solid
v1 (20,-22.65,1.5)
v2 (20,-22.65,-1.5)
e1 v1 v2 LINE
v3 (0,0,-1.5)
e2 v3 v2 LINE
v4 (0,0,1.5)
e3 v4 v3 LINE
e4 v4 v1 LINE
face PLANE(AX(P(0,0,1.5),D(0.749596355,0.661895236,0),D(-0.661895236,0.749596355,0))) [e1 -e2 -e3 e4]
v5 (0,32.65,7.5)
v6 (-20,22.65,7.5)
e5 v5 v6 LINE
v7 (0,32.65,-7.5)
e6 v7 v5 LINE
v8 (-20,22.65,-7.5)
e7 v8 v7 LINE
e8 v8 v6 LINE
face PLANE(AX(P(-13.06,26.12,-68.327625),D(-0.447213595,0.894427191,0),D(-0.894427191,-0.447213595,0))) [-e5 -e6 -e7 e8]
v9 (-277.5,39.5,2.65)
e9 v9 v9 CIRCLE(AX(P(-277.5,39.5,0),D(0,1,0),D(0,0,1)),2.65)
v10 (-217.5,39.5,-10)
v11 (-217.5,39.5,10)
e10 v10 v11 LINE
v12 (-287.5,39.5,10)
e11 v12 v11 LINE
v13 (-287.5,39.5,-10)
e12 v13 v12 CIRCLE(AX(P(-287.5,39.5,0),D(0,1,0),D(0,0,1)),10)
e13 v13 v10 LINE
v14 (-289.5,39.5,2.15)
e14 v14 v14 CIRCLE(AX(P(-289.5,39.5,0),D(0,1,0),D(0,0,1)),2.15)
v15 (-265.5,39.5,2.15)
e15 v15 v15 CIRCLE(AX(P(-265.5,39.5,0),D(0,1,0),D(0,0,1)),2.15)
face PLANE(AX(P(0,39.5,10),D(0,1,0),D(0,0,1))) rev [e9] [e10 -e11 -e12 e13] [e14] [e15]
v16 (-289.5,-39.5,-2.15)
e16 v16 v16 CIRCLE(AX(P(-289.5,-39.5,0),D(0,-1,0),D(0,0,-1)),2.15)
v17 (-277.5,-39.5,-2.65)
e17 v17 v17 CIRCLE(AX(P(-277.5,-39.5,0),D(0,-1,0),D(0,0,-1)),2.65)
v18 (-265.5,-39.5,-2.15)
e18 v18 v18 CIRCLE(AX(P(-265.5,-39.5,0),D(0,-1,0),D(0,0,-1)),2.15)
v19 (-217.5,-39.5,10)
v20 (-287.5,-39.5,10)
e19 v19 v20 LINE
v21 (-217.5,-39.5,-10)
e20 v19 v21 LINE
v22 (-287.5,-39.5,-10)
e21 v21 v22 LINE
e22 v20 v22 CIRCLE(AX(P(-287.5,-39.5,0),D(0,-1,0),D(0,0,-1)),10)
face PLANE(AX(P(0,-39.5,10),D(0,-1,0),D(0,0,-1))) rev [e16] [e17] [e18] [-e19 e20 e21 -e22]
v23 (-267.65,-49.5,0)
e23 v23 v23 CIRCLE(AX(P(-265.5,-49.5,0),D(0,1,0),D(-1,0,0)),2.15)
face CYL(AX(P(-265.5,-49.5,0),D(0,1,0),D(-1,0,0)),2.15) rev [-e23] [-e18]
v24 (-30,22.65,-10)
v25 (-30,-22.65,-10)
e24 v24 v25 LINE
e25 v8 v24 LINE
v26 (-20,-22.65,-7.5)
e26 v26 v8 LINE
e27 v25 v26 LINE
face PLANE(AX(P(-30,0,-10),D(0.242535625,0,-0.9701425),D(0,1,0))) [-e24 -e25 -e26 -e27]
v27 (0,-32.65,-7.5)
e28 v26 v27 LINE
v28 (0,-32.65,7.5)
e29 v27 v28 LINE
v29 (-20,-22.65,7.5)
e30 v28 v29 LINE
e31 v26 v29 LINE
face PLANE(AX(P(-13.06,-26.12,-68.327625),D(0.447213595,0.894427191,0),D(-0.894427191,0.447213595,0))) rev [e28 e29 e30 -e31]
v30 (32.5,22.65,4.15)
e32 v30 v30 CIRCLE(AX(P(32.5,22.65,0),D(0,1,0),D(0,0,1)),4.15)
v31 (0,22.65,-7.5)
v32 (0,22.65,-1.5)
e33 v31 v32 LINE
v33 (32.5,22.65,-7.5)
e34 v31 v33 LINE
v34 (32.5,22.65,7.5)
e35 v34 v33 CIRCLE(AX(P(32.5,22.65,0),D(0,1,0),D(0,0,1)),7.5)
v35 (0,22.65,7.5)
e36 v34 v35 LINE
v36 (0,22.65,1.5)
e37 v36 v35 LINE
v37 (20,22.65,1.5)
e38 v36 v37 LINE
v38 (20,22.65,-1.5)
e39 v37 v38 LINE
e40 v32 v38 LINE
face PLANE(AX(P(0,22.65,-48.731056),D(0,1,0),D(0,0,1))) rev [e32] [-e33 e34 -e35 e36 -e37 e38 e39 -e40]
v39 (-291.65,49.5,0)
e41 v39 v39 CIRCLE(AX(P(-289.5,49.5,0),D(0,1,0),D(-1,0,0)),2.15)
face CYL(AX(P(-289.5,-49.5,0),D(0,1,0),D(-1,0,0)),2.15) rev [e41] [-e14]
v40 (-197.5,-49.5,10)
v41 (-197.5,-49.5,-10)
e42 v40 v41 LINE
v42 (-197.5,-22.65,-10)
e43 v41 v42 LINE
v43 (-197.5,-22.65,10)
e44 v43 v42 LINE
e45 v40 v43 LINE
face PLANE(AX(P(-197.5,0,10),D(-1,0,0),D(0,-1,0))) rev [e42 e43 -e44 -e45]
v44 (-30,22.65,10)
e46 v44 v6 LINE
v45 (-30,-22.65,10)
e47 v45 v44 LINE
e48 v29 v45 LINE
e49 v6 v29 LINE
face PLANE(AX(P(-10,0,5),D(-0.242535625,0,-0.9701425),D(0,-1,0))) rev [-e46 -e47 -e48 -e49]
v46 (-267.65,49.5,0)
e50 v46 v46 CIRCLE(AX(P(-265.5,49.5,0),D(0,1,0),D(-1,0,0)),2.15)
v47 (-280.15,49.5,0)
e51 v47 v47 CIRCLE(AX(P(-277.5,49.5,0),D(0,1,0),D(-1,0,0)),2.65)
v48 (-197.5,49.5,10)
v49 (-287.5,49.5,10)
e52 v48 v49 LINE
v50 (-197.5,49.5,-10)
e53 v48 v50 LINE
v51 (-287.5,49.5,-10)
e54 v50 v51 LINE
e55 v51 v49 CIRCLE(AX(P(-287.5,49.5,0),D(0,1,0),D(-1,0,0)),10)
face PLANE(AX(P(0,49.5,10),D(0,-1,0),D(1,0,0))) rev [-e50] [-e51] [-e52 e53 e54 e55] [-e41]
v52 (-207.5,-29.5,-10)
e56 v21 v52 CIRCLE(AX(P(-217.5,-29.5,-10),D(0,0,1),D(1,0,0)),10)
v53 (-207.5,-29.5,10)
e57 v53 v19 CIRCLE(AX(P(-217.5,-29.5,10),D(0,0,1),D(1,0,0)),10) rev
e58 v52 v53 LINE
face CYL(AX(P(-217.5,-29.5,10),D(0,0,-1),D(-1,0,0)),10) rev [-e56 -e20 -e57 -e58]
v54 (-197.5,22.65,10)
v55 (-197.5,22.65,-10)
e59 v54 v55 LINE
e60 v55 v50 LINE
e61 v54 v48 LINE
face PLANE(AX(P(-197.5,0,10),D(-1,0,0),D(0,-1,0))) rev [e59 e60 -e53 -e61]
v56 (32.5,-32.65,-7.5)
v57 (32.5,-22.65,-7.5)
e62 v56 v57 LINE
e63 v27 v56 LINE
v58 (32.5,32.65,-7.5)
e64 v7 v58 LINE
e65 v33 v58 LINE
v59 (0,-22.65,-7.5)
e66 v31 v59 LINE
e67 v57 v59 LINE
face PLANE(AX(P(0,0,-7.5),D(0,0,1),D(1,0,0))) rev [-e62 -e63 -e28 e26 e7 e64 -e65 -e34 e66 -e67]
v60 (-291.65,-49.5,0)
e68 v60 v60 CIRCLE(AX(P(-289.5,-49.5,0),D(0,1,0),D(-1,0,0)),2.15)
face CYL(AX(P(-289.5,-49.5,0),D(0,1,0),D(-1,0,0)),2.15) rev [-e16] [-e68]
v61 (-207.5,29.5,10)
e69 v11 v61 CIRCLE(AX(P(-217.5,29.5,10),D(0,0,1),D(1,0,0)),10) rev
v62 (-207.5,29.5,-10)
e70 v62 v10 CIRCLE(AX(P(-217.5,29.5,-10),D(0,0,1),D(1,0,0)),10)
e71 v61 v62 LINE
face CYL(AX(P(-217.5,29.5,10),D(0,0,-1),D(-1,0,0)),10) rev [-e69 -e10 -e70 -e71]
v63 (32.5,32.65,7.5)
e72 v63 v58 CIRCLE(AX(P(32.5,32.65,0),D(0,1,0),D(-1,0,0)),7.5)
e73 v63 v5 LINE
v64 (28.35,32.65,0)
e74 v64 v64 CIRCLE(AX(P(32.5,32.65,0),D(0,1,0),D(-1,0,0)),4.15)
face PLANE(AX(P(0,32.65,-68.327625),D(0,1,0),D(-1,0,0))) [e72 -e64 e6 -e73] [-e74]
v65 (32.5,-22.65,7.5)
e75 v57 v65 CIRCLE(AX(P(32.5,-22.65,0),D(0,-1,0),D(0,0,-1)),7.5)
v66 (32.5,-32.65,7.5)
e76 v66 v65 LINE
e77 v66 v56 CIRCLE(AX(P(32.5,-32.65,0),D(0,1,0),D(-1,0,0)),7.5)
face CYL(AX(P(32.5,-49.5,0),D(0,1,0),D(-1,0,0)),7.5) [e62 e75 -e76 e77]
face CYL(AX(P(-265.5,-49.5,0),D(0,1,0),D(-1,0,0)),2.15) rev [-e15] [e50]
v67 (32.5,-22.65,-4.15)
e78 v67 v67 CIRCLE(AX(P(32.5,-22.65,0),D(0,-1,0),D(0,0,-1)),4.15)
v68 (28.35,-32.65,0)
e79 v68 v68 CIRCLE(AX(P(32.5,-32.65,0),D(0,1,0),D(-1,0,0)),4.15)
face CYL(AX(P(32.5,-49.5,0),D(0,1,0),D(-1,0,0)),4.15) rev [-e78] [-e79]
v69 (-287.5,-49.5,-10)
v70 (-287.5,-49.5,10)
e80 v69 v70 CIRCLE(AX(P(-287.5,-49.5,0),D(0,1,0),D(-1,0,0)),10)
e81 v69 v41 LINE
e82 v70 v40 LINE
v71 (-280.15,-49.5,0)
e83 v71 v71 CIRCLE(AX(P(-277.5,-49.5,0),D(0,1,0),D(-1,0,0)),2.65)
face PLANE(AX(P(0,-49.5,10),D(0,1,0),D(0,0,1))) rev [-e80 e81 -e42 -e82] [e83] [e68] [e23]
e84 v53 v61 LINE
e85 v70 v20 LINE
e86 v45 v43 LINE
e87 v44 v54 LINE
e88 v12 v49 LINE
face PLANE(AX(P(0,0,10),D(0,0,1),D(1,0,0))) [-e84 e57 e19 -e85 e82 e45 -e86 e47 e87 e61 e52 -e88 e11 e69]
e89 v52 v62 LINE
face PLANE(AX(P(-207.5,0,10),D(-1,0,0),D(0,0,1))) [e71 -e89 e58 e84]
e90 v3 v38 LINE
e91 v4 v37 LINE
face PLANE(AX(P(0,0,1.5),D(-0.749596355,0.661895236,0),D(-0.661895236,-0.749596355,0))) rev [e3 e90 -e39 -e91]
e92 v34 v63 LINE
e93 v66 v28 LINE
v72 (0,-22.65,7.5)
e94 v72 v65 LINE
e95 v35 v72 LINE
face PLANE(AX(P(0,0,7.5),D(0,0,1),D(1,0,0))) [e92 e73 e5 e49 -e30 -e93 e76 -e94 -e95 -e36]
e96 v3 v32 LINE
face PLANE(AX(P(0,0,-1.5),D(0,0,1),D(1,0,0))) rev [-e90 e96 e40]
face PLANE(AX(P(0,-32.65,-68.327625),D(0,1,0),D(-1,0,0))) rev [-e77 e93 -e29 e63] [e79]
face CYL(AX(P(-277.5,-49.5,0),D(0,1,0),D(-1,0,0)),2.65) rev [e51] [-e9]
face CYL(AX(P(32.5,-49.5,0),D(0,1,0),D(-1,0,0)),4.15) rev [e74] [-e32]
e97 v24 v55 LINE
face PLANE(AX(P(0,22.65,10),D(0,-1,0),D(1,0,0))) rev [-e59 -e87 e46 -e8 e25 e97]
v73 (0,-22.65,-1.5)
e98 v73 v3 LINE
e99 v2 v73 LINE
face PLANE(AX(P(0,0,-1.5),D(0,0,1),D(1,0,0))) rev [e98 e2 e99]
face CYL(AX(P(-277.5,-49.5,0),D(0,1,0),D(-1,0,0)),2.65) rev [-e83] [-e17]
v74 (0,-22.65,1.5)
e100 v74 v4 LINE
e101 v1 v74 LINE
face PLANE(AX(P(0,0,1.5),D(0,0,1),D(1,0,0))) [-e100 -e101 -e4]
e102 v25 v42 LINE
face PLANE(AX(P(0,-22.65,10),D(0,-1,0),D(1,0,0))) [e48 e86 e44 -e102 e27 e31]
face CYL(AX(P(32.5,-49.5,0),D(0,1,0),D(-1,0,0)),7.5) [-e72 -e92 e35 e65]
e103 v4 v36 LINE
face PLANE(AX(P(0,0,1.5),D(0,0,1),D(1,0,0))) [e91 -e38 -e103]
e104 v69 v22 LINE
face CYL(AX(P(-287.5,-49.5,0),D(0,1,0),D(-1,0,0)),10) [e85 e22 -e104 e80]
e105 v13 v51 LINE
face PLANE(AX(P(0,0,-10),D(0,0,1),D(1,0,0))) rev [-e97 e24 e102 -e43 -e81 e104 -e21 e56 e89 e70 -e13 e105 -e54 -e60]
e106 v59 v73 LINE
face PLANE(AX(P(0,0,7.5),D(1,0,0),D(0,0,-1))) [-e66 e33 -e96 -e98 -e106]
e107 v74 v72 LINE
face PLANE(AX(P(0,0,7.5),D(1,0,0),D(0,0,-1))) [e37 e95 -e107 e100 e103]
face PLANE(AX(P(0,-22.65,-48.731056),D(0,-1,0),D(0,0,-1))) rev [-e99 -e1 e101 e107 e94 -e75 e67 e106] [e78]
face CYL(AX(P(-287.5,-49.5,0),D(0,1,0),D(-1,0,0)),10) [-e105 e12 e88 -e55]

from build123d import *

# Parameters (mm, degrees)
SKETCH_2_W               = 187.5
SKETCH_2_H               = 45.3
EXTRUDE_1_DEPTH          = 10
EXTRUDE_2_DEPTH          = 7.5
CHAMFER_1_SIZE           = 20
CHAMFER_1_SIZE_2         = 5
CHAMFER_2_SIZE           = 5
CHAMFER_2_SIZE_2         = 20
SKETCH_7_W               = 40
SKETCH_7_H               = 10
EXTRUDE_6_DEPTH          = 15
SKETCH_7_3_W             = 40
SKETCH_7_3_H             = 10
CUT_EXTRUDE_3_DEPTH      = 15
EXTRUDE_7_DEPTH          = 1.5
CUT_EXTRUDE_1_DEPTH      = 314.699298692
CUT_EXTRUDE_2_DEPTH      = 307.287238552
CUT_EXTRUDE_2_DEPTH_BACK = 307.287238552
FILLET_1_R               = 10


with BuildPart() as part:
    # 草图2 → 凸台-拉伸1 (new, symmetric)
    with BuildSketch(Plane.XY):
        with Locations((-103.75, 0)):
            Rectangle(SKETCH_2_W, SKETCH_2_H)
        Polygon((-297.5, 49.5), (-297.5, 39.5), (-207.5, 39.5), (-207.5, -39.5), (-297.5, -39.5), (-297.5, -49.5), (-197.5, -49.5), (-197.5, 49.5), align=None)
    extrude(amount=EXTRUDE_1_DEPTH, both=True)

    # 草图2<3> → 凸台-拉伸2 (add, symmetric)
    with BuildSketch(Plane.XY):
        Polygon((40, -22.65), (40, -12.65), (0, -12.65), (0, 12.65), (40, 12.65), (40, 22.65), (-10, 22.65), (-10, -22.65), align=None)
    extrude(amount=EXTRUDE_2_DEPTH, both=True)

    # 倒角1
    # the kernel refuses this chamfer: 20, 5 mm, written as the material it takes off along each edge
    with BuildSketch(Plane(origin=(-10, -74.592549995, 10), x_dir=(-0.9999563942249224, 0, 0.00933861064031752), z_dir=(0, 1, 0))) as chamfer_1_piece_1_section:
        Polygon((CHAMFER_1_SIZE * 0.999956394225, -CHAMFER_1_SIZE * 0.00933861064032), (-CHAMFER_1_SIZE_2 * 0.00933861064032, -CHAMFER_1_SIZE_2 * 0.999956394225), (0, 0), align=None)
    chamfer_1_piece_1 = extrude(amount=149.185099991, mode=Mode.PRIVATE)
    chamfer_1_piece_1 = split(chamfer_1_piece_1, bisect_by=Plane(origin=(-18.245866107, 0, 7.5), z_dir=(0, 0, 1)), keep=Keep.TOP, mode=Mode.PRIVATE)
    add(chamfer_1_piece_1, mode=Mode.SUBTRACT)

    # 倒角2
    # the kernel refuses this chamfer: 20, 5 mm, written as the material it takes off along each edge
    with BuildSketch(Plane(origin=(-10, -74.592549995, -10), x_dir=(0.14778356633657133, 0, 0.9890197255468893), z_dir=(0, 1, 0))) as chamfer_2_piece_1_section:
        Polygon((CHAMFER_2_SIZE * 0.989019725547, -CHAMFER_2_SIZE * 0.147783566337), (-CHAMFER_2_SIZE_2 * 0.147783566337, -CHAMFER_2_SIZE_2 * 0.989019725547), (0, 0), align=None)
    chamfer_2_piece_1 = extrude(amount=149.185099991, mode=Mode.PRIVATE)
    chamfer_2_piece_1 = split(chamfer_2_piece_1, bisect_by=Plane(origin=(-18.245866107, 0, -7.5), z_dir=(0, 0, -1)), keep=Keep.TOP, mode=Mode.PRIVATE)
    add(chamfer_2_piece_1, mode=Mode.SUBTRACT)

    # 草图7 → 凸台-拉伸6 (add)
    with BuildSketch(Plane.XY.offset(7.5)):
        Polygon((0, 22.65), (0, 32.65), (-20, 22.65), align=None)
        with Locations((20, 27.65)):
            Rectangle(SKETCH_7_W, SKETCH_7_H)
        Polygon((40, -32.65), (0, -32.65), (-20, -22.65), (40, -22.65), align=None)
    extrude(amount=-EXTRUDE_6_DEPTH)

    # 草图7<3> → 切除-拉伸3 (cut)
    with BuildSketch(Plane.XY.offset(7.5)):
        with Locations((20, 17.65)):
            Rectangle(SKETCH_7_3_W, SKETCH_7_3_H)
        with Locations((20, -17.65)):
            Rectangle(SKETCH_7_3_W, SKETCH_7_3_H)
    extrude(amount=-CUT_EXTRUDE_3_DEPTH, mode=Mode.SUBTRACT)

    # 草图8 → 凸台-拉伸7 (add, symmetric)
    with BuildSketch(Plane.XY):
        Polygon((0, 22.65), (0, 0), (20, 22.65), align=None)
        Polygon((20, -22.65), (0, 0), (0, -22.65), align=None)
    extrude(amount=EXTRUDE_7_DEPTH, both=True)

    # 草图3 → 切除-拉伸1 (cut, through all)
    with BuildSketch(Plane(origin=(0, 49.5, 0), x_dir=(1, 0, 0), z_dir=(0, 1, 0))):
        with BuildLine():
            ThreePointArc((-297.5, 0), (-294.571067812, 7.071067812), (-287.5, 10))
            Line((-287.5, 10), (-297.5, 10))
            Line((-297.5, 10), (-297.5, 0))
        make_face()
        with BuildLine():
            Line((-297.5, -10), (-287.5, -10))
            ThreePointArc((-287.5, -10), (-294.571067812, -7.071067812), (-297.5, 0))
            Line((-297.5, 0), (-297.5, -10))
        make_face()
        with BuildLine():
            ThreePointArc((-291.65, 0), (-289.5, -2.15), (-287.35, 0))
            Line((-287.35, 0), (-291.65, 0))
        make_face()
        with BuildLine():
            Line((-291.65, 0), (-287.35, 0))
            ThreePointArc((-287.35, 0), (-289.5, 2.15), (-291.65, 0))
        make_face()
        with BuildLine():
            ThreePointArc((-280.15, 0), (-277.5, -2.65), (-274.85, 0))
            Line((-274.85, 0), (-280.15, 0))
        make_face()
        with BuildLine():
            Line((-280.15, 0), (-274.85, 0))
            ThreePointArc((-274.85, 0), (-277.5, 2.65), (-280.15, 0))
        make_face()
        with BuildLine():
            ThreePointArc((-267.65, 0), (-265.5, -2.15), (-263.35, 0))
            Line((-263.35, 0), (-267.65, 0))
        make_face()
        with BuildLine():
            Line((-267.65, 0), (-263.35, 0))
            ThreePointArc((-263.35, 0), (-265.5, 2.15), (-267.65, 0))
        make_face()
    extrude(amount=-CUT_EXTRUDE_1_DEPTH, mode=Mode.SUBTRACT)

    # 草图4 → 切除-拉伸2 (cut, two sides: drawn at the far end of the back side and taken through both)
    with BuildSketch(Plane(origin=(0, 22.65, 0), x_dir=(1, 0, 0), z_dir=(0, 1, 0)).offset(-CUT_EXTRUDE_2_DEPTH_BACK)):
        with BuildLine():
            Line((28.35, 0), (36.65, 0))
            ThreePointArc((36.65, 0), (32.5, 4.15), (28.35, 0))
        make_face()
        with BuildLine():
            ThreePointArc((28.35, 0), (32.5, -4.15), (36.65, 0))
            Line((36.65, 0), (28.35, 0))
        make_face()
        with BuildLine():
            ThreePointArc((32.5, 7.5), (37.803300859, 5.303300859), (40, 0))
            Line((40, 0), (40, 7.5))
            Line((40, 7.5), (32.5, 7.5))
        make_face()
        with BuildLine():
            Line((40, -7.5), (40, 0))
            ThreePointArc((40, 0), (37.803300859, -5.303300859), (32.5, -7.5))
            Line((32.5, -7.5), (40, -7.5))
        make_face()
    extrude(amount=CUT_EXTRUDE_2_DEPTH + CUT_EXTRUDE_2_DEPTH_BACK, mode=Mode.SUBTRACT)

    # 圆角1
    fillet_1_edges = [part.edges().sort_by_distance(p)[0] for p in [
        (-207.5, -39.5, 0),
        (-207.5, 39.5, 0),
    ]]
    fillet(fillet_1_edges, radius=FILLET_1_R)


solid = part.part
